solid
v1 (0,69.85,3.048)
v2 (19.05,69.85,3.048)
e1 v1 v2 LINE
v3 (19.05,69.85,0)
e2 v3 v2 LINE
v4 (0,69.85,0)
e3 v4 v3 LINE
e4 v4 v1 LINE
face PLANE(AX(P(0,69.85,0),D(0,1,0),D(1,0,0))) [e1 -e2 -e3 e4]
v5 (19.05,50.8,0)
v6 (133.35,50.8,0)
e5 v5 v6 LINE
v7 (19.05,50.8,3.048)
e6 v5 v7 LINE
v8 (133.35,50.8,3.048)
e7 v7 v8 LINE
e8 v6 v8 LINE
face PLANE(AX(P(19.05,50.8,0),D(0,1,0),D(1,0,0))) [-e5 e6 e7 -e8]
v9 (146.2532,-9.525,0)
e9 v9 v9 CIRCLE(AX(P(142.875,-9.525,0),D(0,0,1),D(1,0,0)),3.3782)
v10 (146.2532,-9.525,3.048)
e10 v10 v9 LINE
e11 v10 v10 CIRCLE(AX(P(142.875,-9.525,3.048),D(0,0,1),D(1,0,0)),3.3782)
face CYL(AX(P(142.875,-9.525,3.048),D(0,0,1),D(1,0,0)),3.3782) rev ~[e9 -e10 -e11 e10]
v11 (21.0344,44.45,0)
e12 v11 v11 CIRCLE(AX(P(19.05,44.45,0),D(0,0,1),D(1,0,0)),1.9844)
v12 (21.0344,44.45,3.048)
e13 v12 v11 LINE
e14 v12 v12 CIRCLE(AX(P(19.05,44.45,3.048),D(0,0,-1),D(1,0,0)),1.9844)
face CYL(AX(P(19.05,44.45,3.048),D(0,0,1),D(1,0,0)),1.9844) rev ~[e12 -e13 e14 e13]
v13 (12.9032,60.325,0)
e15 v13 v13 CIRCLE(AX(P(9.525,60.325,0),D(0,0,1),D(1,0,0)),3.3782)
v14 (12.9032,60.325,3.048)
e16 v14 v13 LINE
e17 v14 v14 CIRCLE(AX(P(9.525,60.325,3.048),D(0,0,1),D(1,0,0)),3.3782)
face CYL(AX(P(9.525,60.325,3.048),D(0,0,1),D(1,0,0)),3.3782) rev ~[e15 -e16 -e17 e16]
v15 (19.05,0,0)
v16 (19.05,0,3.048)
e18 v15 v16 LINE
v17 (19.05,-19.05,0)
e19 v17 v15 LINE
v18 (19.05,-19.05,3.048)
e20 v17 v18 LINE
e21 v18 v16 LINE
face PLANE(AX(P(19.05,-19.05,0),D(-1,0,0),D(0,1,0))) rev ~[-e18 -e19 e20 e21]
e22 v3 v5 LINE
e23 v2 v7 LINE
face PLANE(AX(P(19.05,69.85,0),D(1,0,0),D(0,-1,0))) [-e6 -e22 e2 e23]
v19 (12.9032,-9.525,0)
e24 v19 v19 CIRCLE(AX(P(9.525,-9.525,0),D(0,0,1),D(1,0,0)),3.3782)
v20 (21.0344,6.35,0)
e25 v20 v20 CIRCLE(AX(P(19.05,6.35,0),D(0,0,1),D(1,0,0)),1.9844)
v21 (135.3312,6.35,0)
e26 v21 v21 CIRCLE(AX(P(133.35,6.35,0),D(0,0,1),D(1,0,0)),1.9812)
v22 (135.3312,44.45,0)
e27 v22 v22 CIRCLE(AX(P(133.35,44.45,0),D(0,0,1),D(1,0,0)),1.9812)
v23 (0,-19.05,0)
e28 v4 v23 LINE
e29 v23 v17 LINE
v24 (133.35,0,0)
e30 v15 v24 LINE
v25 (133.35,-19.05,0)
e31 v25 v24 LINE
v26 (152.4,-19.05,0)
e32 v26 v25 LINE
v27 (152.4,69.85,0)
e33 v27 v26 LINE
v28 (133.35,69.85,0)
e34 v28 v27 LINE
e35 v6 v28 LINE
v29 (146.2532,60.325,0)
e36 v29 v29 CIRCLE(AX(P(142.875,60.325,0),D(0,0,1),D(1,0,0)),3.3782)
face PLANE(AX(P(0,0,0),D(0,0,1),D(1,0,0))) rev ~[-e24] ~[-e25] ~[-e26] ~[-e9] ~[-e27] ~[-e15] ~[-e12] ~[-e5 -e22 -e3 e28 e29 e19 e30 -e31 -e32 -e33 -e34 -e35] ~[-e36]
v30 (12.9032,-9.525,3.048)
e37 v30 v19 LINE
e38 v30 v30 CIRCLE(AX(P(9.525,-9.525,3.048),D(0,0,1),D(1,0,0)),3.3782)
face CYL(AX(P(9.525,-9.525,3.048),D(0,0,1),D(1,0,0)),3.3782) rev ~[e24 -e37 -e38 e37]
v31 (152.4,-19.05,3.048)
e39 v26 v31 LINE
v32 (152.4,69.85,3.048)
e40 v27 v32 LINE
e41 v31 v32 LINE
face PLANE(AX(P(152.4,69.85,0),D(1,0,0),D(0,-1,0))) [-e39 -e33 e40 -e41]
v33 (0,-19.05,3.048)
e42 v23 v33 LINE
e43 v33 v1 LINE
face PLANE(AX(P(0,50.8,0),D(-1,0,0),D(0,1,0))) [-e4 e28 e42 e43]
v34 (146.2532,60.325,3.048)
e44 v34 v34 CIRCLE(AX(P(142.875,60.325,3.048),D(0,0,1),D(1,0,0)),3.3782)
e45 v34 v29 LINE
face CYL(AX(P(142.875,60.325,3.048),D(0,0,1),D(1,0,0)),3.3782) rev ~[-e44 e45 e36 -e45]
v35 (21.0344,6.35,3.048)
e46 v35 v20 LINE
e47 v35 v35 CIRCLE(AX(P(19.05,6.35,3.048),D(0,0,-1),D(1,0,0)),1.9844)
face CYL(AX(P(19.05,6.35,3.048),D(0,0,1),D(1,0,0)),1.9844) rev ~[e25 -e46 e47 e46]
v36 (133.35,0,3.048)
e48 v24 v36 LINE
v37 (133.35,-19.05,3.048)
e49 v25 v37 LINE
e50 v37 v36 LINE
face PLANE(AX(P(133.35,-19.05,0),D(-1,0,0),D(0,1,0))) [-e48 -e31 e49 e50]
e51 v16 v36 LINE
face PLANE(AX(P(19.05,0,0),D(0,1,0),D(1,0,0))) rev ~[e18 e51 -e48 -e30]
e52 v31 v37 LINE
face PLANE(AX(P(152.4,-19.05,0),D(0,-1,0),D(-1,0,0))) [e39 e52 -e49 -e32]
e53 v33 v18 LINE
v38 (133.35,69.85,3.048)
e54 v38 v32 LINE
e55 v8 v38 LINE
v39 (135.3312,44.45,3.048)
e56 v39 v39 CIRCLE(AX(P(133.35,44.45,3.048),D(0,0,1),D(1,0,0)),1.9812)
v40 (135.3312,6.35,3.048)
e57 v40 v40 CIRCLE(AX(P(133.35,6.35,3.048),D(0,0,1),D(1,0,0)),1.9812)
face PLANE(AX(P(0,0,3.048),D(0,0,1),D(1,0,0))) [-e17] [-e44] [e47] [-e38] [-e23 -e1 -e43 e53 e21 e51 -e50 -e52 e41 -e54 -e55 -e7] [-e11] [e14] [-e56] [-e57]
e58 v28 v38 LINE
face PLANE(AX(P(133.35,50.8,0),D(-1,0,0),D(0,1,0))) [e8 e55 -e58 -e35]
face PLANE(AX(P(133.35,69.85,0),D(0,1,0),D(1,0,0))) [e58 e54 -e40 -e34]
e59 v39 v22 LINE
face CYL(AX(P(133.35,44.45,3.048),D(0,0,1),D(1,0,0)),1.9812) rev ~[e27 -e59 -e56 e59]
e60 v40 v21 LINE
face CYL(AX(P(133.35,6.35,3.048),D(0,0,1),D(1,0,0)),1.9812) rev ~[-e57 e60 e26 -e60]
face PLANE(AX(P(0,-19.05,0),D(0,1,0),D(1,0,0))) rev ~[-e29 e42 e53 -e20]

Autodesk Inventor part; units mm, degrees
ref_plane "YZ Plane" through (0, 0, 0) normal (1, 0, 0) x (0, 1, 0)
ref_plane "XZ Plane" through (0, 0, 0) normal (0, 1, 0) x (-1, 0, 0)
ref_plane "XY Plane" through (0, 0, 0) normal (0, 0, 1) x (1, 0, 0)
sketch "Sketch1" plane through (0, 0, 0) normal (0, 0, 1) x (1, 0, 0)
  line L0 (0, 50.8) -> (0, 0)
  line L1 (152.4, 0) -> (152.4, 0)
  line L2 (19.05, 0) -> (133.35, 0)
  line L3 (152.4, 0) -> (152.4, 50.8)
  line L4 (19.05, 50.8) -> (133.35, 50.8)
  line L5 (0, 50.8) -> (0, 69.85)
  line L6 (0, 69.85) -> (19.05, 69.85)
  line L7 (19.05, 69.85) -> (19.05, 50.8)
  line L8 (0, 0) -> (0, -19.05)
  line L9 (0, -19.05) -> (19.05, -19.05)
  line L10 (19.05, -19.05) -> (19.05, 0)
  line L11 (133.35, 50.8) -> (133.35, 69.85)
  line L12 (133.35, 69.85) -> (152.4, 69.85)
  line L13 (152.4, 69.85) -> (152.4, 50.8)
  line L14 (152.4, 0) -> (152.4, -19.05)
  line L15 (152.4, -19.05) -> (133.35, -19.05)
  line L16 (133.35, -19.05) -> (133.35, 0)
  dimension "d23" = 50.8
  dimension "d26" = 152.4
  dimension "d77" = 19.05
  dimension "d78" = 19.05
  dimension "d79" = 19.05
  dimension "d81" = 19.05
  dimension "d82" = 19.05
  dimension "d83" = 19.05
  dimension "d84" = 19.05
extrude "Plate2" add sketch "Sketch1" along normal blind 3.048
sketch "Sketch8" plane through (0, 0, 3.048) normal (0, 0, 1) x (1, 0, 0)
  line L0 (133.35, 0) -> (19.05, 0) projected
  line L1 (19.05, 50.8) -> (19.05, 0)
  line L2 (19.05, 25.4) -> (19.05, 44.45)
  line L3 (19.05, 25.4) -> (19.05, 6.35)
  circle A0 centre (19.05, 44.45) radius 1.9844
  circle A1 centre (19.05, 6.35) radius 1.9844
  line L4 (152.4, 69.85) -> (152.4, -19.05) projected
  circle A2 centre (133.35, 44.45) radius 1.9812
  circle A3 centre (133.35, 6.35) radius 1.9812
  line L5 (19.05, -19.05) -> (0, -19.05) projected
  line L6 (19.05, 0) -> (19.05, -19.05) projected
  line L7 (133.35, -19.05) -> (133.35, 0) projected
  line L8 (152.4, -19.05) -> (133.35, -19.05) projected
  line L9 (133.35, 69.85) -> (152.4, 69.85) projected
  line L10 (19.05, 69.85) -> (19.05, 50.8) projected
  line L11 (0, 69.85) -> (19.05, 69.85) projected
  circle A4 centre (9.525, 60.325) radius 3.3782
  circle A5 centre (9.525, -9.525) radius 3.3782
  circle A6 centre (142.875, 60.325) radius 3.3782
  circle A7 centre (142.875, -9.525) radius 3.3782
  point P0 (0, 0)
  point P1 (152.4, 0)
  point P2 (152.4, 50.8)
  dimension "d63" = 19.05
  dimension "d64" = 19.05
  dimension "d65" = 3.9688
  dimension "d66" = 3.9688
  dimension "d69" = 3.9624
  dimension "d70" = 3.9624
  dimension "d71" = 19.05
  dimension "d72" = 38.1
  dimension "d73" = 19.05
  dimension "d74" = 6.35
  dimension "d85" = 6.7564
  dimension "d86" = 6.7564
  dimension "d87" = 9.525
  dimension "d88" = 9.525
  dimension "d89" = 9.525
  dimension "d90" = 9.525
  dimension "d92" = 6.7564
  dimension "d93" = 6.7564
  dimension "d94" = 9.525
  dimension "d95" = 9.525
  dimension "d96" = 9.525
  dimension "d97" = 9.525
  dimension "d98" = 6.35
extrude "Cut9" cut sketch "Sketch8" against normal blind 3.048
equation "\"d105\" = Thickness"
equation "\"BendRadius\" = Thickness"
equation "\"BendReliefWidth\" = Thickness"
equation "\"BendReliefDepth\" = 0.5 * Thickness"
equation "\"CornerReliefSize\" = 4 * Thickness"
equation "\"MinimumRemnant\" = 2 * Thickness"
equation "\"TransitionRadius\" = BendRadius"
equation "\"JacobiRadiusSize\" = BendRadius"
equation "\"GapSize\" = Thickness"
equation "\"d10\" = BendRadius"
equation "\"d11\" = BendRadius"
equation "\"Thickness\" = 3.048"
properties part number "Pneumatic Piston Bracket_v1"
